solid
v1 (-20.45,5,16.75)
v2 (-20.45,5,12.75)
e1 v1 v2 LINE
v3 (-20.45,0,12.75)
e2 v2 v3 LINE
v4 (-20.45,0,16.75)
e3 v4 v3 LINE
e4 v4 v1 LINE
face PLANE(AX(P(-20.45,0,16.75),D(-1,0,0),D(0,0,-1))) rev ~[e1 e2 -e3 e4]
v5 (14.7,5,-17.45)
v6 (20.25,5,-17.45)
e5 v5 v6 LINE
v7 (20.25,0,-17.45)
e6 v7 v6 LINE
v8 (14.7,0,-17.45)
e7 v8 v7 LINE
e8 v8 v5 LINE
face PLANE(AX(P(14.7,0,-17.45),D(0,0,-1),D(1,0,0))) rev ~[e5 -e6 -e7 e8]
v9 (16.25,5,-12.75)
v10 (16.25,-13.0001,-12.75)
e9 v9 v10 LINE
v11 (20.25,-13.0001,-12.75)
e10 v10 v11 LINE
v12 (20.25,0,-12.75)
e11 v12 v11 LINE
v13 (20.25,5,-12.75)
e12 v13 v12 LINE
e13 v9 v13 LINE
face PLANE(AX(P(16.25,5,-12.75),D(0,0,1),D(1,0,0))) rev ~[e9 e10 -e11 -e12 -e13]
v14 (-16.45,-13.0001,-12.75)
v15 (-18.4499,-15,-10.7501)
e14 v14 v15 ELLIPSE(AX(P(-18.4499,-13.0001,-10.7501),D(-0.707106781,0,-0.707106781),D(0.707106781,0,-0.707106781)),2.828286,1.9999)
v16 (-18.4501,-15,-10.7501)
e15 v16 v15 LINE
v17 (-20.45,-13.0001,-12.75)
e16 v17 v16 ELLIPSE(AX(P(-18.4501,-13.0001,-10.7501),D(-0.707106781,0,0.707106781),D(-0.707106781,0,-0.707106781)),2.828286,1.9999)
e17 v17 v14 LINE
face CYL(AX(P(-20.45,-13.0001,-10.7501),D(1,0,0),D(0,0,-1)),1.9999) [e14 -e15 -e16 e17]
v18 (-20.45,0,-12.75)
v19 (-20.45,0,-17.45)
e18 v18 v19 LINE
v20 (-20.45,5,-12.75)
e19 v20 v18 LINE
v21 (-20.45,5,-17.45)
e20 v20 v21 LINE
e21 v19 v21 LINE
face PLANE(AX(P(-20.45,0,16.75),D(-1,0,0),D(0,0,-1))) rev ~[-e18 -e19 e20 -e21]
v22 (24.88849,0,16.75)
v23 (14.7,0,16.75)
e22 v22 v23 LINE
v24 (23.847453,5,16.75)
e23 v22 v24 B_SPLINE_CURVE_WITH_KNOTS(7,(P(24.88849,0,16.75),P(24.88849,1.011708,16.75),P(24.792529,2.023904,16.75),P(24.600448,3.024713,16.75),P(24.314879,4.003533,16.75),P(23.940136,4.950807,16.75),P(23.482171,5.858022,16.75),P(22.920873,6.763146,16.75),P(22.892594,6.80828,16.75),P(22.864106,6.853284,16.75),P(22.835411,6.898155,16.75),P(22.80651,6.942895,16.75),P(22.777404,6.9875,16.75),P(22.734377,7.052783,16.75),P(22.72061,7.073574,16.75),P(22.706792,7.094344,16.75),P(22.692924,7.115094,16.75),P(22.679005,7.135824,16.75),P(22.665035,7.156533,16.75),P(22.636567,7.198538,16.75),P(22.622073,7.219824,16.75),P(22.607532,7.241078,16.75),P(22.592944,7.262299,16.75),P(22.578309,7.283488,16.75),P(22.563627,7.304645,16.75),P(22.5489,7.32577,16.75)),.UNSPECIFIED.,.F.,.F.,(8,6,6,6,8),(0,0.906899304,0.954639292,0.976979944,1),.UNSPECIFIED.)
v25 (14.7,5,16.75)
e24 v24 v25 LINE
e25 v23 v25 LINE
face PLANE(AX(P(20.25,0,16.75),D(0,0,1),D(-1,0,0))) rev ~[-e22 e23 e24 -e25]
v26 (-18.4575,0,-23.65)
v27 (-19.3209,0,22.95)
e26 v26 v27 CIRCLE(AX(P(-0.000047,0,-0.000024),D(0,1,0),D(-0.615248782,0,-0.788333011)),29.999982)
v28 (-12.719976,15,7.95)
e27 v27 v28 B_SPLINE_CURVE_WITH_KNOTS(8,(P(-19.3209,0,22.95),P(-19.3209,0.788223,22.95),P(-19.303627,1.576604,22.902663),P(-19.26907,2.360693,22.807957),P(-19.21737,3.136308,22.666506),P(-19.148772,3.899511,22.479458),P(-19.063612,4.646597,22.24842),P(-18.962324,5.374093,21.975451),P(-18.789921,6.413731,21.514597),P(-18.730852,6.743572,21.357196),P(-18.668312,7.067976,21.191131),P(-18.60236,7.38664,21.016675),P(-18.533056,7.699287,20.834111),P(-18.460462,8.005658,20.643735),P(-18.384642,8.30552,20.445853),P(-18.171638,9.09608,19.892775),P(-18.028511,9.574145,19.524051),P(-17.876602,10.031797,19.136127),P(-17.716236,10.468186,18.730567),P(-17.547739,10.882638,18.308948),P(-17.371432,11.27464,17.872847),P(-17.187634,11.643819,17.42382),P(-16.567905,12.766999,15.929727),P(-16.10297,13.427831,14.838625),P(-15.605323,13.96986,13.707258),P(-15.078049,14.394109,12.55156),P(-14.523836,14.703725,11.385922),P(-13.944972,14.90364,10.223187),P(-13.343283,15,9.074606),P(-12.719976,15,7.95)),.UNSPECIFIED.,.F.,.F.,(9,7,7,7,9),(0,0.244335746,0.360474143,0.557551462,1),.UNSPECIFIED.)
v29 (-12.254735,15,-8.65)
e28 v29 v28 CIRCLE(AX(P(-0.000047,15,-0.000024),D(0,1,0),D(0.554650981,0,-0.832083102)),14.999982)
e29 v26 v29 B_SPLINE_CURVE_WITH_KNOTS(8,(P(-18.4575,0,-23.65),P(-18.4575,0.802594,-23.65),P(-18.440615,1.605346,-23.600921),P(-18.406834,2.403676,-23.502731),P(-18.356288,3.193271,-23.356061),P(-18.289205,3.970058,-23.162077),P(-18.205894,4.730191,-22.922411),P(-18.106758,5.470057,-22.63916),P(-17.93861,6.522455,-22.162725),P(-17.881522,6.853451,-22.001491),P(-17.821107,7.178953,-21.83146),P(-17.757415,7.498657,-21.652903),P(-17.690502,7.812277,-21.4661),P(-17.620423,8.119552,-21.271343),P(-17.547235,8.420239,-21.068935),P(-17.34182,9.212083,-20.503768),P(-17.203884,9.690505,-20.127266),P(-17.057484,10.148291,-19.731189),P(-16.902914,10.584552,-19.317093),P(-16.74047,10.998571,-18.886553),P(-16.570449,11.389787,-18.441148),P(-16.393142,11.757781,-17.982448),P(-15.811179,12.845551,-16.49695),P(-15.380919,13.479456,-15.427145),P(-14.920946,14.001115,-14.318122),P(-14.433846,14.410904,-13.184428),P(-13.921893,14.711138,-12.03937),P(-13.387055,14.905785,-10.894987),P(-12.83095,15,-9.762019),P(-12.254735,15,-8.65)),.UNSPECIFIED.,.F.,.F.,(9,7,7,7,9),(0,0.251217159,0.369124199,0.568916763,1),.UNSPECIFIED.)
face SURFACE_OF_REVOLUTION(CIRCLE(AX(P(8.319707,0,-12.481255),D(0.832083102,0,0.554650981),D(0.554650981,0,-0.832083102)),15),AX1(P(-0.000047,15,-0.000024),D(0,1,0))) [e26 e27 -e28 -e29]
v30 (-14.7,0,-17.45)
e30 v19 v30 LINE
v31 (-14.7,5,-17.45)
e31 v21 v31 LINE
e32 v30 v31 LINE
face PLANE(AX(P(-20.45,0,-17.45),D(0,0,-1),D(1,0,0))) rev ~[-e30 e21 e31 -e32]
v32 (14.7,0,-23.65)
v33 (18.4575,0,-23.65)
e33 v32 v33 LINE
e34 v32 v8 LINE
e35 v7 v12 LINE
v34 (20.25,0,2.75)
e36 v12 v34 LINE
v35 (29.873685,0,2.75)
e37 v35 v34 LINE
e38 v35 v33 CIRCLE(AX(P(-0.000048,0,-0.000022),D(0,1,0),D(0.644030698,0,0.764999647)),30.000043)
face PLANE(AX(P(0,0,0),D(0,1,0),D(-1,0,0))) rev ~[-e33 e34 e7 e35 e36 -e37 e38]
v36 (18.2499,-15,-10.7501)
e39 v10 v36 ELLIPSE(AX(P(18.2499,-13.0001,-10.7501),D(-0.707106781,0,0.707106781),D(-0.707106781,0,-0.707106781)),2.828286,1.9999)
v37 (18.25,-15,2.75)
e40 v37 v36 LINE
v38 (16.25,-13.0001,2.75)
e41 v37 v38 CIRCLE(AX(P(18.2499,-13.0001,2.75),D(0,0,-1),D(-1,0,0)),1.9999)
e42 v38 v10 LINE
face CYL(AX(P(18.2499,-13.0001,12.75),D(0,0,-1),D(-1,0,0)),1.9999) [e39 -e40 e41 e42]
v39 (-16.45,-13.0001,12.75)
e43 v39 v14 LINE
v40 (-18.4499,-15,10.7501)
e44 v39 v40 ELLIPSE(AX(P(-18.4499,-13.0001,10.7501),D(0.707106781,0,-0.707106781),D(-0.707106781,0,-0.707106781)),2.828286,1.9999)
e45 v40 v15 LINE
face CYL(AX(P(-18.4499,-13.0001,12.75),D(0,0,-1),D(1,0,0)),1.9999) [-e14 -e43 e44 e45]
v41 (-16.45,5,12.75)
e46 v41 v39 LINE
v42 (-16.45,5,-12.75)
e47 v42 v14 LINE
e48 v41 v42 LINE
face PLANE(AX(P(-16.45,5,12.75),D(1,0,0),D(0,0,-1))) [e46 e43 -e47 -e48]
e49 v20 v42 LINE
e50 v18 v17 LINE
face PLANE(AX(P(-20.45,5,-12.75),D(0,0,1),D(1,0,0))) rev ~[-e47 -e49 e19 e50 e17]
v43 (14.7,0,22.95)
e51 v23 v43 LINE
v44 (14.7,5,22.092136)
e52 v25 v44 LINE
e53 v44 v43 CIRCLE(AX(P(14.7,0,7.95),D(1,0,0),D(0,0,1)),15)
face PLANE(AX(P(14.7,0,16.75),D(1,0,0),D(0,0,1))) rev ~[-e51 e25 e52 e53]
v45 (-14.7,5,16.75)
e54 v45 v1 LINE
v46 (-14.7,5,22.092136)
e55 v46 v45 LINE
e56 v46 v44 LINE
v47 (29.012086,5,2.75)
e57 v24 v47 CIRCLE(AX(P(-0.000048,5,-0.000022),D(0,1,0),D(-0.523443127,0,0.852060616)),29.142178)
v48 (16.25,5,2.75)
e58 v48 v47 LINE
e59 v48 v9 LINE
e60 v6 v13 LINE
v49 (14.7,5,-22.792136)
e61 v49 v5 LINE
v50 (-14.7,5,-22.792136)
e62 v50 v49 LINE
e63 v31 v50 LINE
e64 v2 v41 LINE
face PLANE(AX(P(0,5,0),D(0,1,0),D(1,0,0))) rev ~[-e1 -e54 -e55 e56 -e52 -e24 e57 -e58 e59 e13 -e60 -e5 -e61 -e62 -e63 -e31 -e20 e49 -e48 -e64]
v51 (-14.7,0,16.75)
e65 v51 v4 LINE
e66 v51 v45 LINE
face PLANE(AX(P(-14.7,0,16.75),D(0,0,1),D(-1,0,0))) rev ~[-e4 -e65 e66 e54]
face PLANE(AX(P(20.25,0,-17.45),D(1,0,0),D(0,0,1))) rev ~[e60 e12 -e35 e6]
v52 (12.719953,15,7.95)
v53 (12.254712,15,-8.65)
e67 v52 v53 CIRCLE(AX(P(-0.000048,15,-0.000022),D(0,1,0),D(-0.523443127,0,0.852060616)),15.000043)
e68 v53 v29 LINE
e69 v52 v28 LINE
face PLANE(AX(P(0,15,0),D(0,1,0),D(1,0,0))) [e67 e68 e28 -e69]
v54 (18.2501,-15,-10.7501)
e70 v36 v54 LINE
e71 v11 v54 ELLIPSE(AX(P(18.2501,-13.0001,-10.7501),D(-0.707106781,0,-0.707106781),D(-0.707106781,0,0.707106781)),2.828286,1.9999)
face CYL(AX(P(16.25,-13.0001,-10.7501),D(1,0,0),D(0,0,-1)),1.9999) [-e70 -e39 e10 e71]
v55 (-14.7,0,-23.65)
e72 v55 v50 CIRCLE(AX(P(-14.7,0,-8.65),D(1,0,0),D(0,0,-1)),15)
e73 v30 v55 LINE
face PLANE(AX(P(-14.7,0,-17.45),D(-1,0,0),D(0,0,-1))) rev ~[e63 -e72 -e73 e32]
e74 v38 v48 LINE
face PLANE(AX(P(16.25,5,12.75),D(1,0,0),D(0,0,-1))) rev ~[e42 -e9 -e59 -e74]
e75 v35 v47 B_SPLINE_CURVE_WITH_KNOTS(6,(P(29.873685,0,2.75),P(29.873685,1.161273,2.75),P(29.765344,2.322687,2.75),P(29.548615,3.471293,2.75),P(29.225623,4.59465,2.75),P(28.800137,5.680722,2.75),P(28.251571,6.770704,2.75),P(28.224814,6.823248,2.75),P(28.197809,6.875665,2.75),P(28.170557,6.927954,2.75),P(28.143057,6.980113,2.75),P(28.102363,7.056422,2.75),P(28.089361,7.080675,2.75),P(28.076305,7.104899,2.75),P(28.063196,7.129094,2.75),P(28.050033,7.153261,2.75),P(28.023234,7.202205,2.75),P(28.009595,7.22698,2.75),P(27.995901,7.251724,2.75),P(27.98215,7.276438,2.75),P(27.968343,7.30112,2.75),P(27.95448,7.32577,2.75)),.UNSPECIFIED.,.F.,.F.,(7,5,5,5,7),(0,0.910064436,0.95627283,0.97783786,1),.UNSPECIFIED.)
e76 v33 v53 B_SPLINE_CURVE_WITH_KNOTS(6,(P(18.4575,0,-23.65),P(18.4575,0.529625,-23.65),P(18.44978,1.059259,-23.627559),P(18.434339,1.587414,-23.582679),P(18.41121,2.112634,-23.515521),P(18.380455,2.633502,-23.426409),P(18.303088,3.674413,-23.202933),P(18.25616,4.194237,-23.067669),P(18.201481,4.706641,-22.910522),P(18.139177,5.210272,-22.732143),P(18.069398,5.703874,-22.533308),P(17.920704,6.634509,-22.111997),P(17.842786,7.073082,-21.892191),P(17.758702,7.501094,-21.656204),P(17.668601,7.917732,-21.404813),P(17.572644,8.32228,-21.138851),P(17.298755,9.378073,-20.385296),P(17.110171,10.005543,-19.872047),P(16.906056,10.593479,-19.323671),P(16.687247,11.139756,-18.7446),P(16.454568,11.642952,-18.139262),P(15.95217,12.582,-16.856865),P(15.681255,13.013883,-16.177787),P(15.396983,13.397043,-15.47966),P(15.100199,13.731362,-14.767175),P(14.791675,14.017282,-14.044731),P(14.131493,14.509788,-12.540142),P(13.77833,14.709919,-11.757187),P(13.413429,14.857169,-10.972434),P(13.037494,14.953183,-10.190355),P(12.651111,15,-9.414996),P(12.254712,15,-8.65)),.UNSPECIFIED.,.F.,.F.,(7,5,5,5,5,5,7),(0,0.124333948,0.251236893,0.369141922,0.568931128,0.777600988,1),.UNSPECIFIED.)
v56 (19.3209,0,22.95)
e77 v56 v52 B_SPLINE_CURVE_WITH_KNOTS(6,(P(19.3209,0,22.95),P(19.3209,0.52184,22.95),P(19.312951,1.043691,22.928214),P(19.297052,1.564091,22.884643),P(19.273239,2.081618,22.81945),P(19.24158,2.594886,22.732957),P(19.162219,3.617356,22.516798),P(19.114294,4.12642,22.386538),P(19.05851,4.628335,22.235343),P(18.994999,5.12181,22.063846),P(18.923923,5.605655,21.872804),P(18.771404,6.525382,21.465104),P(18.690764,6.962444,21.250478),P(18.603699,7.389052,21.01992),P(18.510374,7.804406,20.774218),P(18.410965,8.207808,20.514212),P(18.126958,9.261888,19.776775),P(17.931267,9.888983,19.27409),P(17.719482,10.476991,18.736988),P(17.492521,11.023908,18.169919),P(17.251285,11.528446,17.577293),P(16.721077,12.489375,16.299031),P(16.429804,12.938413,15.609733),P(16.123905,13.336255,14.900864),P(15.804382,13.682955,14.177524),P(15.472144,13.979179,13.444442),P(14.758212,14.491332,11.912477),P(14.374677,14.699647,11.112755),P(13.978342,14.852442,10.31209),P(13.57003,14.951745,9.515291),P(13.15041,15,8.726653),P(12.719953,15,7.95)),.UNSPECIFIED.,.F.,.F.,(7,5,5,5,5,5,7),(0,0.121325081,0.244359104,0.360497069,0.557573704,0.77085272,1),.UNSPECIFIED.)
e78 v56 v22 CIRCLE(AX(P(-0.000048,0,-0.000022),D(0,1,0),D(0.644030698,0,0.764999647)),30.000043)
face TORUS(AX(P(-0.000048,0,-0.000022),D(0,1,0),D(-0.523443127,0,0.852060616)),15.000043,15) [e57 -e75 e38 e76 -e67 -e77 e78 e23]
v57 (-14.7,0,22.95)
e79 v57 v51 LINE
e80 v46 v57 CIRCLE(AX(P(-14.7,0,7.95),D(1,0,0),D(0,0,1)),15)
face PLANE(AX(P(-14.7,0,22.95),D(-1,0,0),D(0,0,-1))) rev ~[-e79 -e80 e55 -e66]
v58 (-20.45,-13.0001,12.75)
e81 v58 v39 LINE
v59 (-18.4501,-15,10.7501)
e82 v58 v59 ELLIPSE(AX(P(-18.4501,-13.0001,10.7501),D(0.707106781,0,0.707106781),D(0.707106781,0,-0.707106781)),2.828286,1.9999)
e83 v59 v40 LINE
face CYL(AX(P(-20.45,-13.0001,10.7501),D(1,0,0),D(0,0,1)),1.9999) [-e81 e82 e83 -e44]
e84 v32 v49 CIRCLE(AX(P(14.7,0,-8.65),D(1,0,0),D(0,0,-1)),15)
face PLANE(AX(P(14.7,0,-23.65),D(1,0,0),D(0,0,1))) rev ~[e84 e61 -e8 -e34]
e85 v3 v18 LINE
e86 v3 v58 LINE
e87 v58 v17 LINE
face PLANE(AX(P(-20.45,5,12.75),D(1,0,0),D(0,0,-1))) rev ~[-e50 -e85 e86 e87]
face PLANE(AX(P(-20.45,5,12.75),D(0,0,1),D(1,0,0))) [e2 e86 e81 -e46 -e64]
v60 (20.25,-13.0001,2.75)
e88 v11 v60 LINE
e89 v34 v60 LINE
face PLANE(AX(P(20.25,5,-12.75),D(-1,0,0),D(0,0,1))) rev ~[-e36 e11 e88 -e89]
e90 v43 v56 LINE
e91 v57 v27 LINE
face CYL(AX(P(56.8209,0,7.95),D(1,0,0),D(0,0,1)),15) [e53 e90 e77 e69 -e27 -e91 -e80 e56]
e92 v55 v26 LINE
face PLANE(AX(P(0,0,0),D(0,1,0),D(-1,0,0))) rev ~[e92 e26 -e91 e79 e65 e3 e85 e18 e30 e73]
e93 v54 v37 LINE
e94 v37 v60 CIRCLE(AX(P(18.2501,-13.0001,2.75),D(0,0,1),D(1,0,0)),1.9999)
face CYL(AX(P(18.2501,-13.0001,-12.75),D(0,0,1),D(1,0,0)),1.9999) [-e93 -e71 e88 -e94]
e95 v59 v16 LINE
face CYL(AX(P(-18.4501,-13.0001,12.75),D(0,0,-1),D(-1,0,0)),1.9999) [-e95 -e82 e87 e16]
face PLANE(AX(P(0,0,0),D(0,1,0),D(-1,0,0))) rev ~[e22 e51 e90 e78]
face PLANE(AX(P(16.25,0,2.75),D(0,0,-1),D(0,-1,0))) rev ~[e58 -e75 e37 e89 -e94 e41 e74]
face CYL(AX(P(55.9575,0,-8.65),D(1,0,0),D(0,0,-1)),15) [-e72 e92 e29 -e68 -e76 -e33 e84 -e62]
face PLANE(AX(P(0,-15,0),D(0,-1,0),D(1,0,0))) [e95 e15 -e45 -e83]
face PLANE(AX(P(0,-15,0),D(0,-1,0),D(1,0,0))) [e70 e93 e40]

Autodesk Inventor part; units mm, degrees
ref_plane "YZ Plane" through (0, 0, 0) normal (1, 0, 0) x (0, 1, 0)
ref_plane "XZ Plane" through (0, 0, 0) normal (0, 1, 0) x (-1, 0, 0)
ref_plane "XY Plane" through (0, 0, 0) normal (0, 0, 1) x (1, 0, 0)
sketch "스케치1" plane through (0, 0, 0) normal (0, 1, 0) x (-1, 0, 0)
  line L0 (14.7, -17.45) -> (14.7, -23.65)
  line L1 (-14.7, -23.65) -> (-14.7, -17.45)
  line L2 (-14.7, -17.45) -> (-20.25, -17.45)
  line L3 (-20.25, -17.45) -> (-20.25, 16.75)
  line L4 (-20.25, 16.75) -> (-14.7, 16.75)
  line L5 (-14.7, 16.75) -> (-14.7, 22.95)
  line L6 (14.7, 22.95) -> (14.7, 16.75)
  line L7 (14.7, 16.75) -> (20.45, 16.75)
  line L8 (20.45, 16.75) -> (20.45, -17.45)
  line L9 (20.45, -17.45) -> (14.7, -17.45)
  line L10 (-14.7, -23.65) -> (-18.4575, -23.65)
  line L11 (14.7, -23.65) -> (18.4575, -23.65)
  line L12 (14.7, 22.95) -> (19.3209, 22.95)
  line L13 (-14.7, 22.95) -> (-19.3209, 22.95)
  arc A0 (-19.3209, 22.95) -> (-18.4575, -23.65) centre (0, 0) ccw
  arc A1 (18.4575, -23.65) -> (19.3209, 22.95) centre (0, 0) ccw
  line L14 (-18.4575, -23.65) -> (-14.7, -23.65)
  line L15 (14.7, -23.65) -> (18.4575, -23.65)
  point P0 (-20, 0)
  point P1 (-30, 0)
  dimension "d12" = 40.7
  dimension "d13" = 34.2
extrude "돌출1" add sketch "스케치1" along normal blind 5
sketch "스케치2" plane through (0, 5, 0) normal (0, 1, 0) x (1, 0, 0)
  line L0 (-14.7, 23.65) -> (-18.4575, 23.65) projected
  arc A0 (-18.4575, 23.65) -> (-19.3209, -22.95) centre (0, 0) ccw projected
  line L1 (-19.3209, -22.95) -> (-14.7, -22.95) projected
  line L2 (-14.7, -22.95) -> (-14.7, -16.75) projected
  line L3 (-14.7, -16.75) -> (-20.45, -16.75) projected
  line L4 (-20.45, -16.75) -> (-20.45, 17.45) projected
  line L5 (-20.45, 17.45) -> (-14.7, 17.45) projected
  line L6 (-14.7, 17.45) -> (-14.7, 23.65) projected
  line L7 (18.4575, 23.65) -> (14.7, 23.65) projected
  line L8 (14.7, 23.65) -> (14.7, 17.45) projected
  line L9 (14.7, 17.45) -> (20.25, 17.45) projected
  line L10 (20.25, 17.45) -> (20.25, -16.75) projected
  line L11 (20.25, -16.75) -> (14.7, -16.75) projected
  line L12 (14.7, -16.75) -> (14.7, -22.95) projected
  line L13 (14.7, -22.95) -> (19.3209, -22.95) projected
  arc A1 (19.3209, -22.95) -> (18.4575, 23.65) centre (0, 0) ccw projected
  line L14 (14.7, -22.95) -> (-14.7, -22.95)
  line L15 (-14.7, 23.65) -> (14.7, 23.65)
extrude "돌출2" add sketch "스케치2" along normal blind 10
fillet "모깎기1" radius 15 4 edges at (-29.9949, 15, -0.5558) (29.9949, 15, -0.5558) (0, 15, 22.95) (0, 15, -23.65)
sketch "스케치3" plane through (0, 5, 0) normal (0, -1, 0) x (1, 0, 0)
  line L0 (-14.7, 22.0921) -> (14.7, 22.0921) projected
  line L1 (-14.7, 22.0921) -> (-14.7, 16.75) projected
  line L2 (-14.7, 16.75) -> (-20.45, 16.75) projected
  line L3 (-20.45, 16.75) -> (-20.45, -17.45) projected
  line L4 (-20.45, -17.45) -> (-14.7, -17.45) projected
  line L5 (-14.7, -17.45) -> (-14.7, -22.7921) projected
  line L6 (14.7, -22.7921) -> (-14.7, -22.7921) projected
  line L7 (14.7, -22.7921) -> (14.7, -17.45) projected
  line L8 (14.7, -17.45) -> (20.25, -17.45) projected
  line L9 (20.25, -17.45) -> (20.25, 16.75) projected
  line L10 (20.25, 16.75) -> (14.7, 16.75) projected
  line L11 (14.7, 16.75) -> (14.7, 22.0921) projected
  line L12 (20.25, 16.75) -> (-20.45, 16.75)
  line L13 (-20.45, 16.75) -> (-20.45, 12.75)
  line L14 (-20.45, 12.75) -> (20.25, 12.75)
  line L15 (20.25, 12.75) -> (20.25, 16.75)
  line L16 (20.25, -17.45) -> (-20.45, -17.45)
  line L17 (-20.45, -17.45) -> (-20.45, -12.75)
  line L18 (-20.45, -12.75) -> (20.25, -12.75)
  line L19 (20.25, -12.75) -> (20.25, -17.45)
  line L20 (20.25, 12.75) -> (16.25, 12.75)
  line L21 (16.25, 12.75) -> (16.25, -12.75)
  line L22 (16.25, -12.75) -> (20.25, -12.75)
  line L23 (20.25, -12.75) -> (20.25, 12.75)
  line L24 (-20.45, 12.75) -> (-16.45, 12.75)
  line L25 (-16.45, 12.75) -> (-16.45, -12.75)
  line L26 (-16.45, -12.75) -> (-20.45, -12.75)
  line L27 (-20.45, -12.75) -> (-20.45, 12.75)
  point P0 (0, 0)
  point P1 (-16.45, 12.75)
  point P2 (20.25, -12.75)
  point P3 (20.25, 12.75)
  dimension "d5" = 4
  dimension "d6" = 4.7
  dimension "d7" = 4
  dimension "d8" = 4
extrude "돌출3" add sketch "스케치3" along normal blind 20 contours L14 L25 L18 L3 | L9 L18 L21 L14
fillet "모깎기2" radius 2 8 edges at (16.25, -15, 0) (18.25, -15, 12.75) (20.25, -15, 0) (18.25, -15, -12.75) (-16.45, -15, 0) (-18.45, -15, 12.75) (-20.45, -15, 0) (-18.45, -15, -12.75)
sketch "스케치4" plane through (16.25, 5, -12.75) normal (-1, 0, 0) x (0, 0, 1)
  line L0 (0, -18) -> (25.5, -18) projected
  line L1 (0, -5) -> (0, -18) projected
  line L2 (0, -5) -> (25.5, -5) projected
  line L3 (25.5, -5) -> (25.5, -18) projected
  line L4 (29.5, -5) -> (29.5, 0) projected
  line L5 (29.5, 0) -> (15.5, 0)
  line L6 (15.5, 0) -> (15.5, -23.2577)
  line L7 (15.5, -23.2577) -> (29.5, -23.2577)
  line L8 (29.5, -23.2577) -> (29.5, 0)
  point P0 (12.75, -5)
  dimension "d14" = 14
extrude "돌출4" cut sketch "스케치4" against normal blind 20 contours L6 L2 L3 L0 | L0 L3 L2 L6 L5 L4 L8 L7
properties part number "arm cover1"
